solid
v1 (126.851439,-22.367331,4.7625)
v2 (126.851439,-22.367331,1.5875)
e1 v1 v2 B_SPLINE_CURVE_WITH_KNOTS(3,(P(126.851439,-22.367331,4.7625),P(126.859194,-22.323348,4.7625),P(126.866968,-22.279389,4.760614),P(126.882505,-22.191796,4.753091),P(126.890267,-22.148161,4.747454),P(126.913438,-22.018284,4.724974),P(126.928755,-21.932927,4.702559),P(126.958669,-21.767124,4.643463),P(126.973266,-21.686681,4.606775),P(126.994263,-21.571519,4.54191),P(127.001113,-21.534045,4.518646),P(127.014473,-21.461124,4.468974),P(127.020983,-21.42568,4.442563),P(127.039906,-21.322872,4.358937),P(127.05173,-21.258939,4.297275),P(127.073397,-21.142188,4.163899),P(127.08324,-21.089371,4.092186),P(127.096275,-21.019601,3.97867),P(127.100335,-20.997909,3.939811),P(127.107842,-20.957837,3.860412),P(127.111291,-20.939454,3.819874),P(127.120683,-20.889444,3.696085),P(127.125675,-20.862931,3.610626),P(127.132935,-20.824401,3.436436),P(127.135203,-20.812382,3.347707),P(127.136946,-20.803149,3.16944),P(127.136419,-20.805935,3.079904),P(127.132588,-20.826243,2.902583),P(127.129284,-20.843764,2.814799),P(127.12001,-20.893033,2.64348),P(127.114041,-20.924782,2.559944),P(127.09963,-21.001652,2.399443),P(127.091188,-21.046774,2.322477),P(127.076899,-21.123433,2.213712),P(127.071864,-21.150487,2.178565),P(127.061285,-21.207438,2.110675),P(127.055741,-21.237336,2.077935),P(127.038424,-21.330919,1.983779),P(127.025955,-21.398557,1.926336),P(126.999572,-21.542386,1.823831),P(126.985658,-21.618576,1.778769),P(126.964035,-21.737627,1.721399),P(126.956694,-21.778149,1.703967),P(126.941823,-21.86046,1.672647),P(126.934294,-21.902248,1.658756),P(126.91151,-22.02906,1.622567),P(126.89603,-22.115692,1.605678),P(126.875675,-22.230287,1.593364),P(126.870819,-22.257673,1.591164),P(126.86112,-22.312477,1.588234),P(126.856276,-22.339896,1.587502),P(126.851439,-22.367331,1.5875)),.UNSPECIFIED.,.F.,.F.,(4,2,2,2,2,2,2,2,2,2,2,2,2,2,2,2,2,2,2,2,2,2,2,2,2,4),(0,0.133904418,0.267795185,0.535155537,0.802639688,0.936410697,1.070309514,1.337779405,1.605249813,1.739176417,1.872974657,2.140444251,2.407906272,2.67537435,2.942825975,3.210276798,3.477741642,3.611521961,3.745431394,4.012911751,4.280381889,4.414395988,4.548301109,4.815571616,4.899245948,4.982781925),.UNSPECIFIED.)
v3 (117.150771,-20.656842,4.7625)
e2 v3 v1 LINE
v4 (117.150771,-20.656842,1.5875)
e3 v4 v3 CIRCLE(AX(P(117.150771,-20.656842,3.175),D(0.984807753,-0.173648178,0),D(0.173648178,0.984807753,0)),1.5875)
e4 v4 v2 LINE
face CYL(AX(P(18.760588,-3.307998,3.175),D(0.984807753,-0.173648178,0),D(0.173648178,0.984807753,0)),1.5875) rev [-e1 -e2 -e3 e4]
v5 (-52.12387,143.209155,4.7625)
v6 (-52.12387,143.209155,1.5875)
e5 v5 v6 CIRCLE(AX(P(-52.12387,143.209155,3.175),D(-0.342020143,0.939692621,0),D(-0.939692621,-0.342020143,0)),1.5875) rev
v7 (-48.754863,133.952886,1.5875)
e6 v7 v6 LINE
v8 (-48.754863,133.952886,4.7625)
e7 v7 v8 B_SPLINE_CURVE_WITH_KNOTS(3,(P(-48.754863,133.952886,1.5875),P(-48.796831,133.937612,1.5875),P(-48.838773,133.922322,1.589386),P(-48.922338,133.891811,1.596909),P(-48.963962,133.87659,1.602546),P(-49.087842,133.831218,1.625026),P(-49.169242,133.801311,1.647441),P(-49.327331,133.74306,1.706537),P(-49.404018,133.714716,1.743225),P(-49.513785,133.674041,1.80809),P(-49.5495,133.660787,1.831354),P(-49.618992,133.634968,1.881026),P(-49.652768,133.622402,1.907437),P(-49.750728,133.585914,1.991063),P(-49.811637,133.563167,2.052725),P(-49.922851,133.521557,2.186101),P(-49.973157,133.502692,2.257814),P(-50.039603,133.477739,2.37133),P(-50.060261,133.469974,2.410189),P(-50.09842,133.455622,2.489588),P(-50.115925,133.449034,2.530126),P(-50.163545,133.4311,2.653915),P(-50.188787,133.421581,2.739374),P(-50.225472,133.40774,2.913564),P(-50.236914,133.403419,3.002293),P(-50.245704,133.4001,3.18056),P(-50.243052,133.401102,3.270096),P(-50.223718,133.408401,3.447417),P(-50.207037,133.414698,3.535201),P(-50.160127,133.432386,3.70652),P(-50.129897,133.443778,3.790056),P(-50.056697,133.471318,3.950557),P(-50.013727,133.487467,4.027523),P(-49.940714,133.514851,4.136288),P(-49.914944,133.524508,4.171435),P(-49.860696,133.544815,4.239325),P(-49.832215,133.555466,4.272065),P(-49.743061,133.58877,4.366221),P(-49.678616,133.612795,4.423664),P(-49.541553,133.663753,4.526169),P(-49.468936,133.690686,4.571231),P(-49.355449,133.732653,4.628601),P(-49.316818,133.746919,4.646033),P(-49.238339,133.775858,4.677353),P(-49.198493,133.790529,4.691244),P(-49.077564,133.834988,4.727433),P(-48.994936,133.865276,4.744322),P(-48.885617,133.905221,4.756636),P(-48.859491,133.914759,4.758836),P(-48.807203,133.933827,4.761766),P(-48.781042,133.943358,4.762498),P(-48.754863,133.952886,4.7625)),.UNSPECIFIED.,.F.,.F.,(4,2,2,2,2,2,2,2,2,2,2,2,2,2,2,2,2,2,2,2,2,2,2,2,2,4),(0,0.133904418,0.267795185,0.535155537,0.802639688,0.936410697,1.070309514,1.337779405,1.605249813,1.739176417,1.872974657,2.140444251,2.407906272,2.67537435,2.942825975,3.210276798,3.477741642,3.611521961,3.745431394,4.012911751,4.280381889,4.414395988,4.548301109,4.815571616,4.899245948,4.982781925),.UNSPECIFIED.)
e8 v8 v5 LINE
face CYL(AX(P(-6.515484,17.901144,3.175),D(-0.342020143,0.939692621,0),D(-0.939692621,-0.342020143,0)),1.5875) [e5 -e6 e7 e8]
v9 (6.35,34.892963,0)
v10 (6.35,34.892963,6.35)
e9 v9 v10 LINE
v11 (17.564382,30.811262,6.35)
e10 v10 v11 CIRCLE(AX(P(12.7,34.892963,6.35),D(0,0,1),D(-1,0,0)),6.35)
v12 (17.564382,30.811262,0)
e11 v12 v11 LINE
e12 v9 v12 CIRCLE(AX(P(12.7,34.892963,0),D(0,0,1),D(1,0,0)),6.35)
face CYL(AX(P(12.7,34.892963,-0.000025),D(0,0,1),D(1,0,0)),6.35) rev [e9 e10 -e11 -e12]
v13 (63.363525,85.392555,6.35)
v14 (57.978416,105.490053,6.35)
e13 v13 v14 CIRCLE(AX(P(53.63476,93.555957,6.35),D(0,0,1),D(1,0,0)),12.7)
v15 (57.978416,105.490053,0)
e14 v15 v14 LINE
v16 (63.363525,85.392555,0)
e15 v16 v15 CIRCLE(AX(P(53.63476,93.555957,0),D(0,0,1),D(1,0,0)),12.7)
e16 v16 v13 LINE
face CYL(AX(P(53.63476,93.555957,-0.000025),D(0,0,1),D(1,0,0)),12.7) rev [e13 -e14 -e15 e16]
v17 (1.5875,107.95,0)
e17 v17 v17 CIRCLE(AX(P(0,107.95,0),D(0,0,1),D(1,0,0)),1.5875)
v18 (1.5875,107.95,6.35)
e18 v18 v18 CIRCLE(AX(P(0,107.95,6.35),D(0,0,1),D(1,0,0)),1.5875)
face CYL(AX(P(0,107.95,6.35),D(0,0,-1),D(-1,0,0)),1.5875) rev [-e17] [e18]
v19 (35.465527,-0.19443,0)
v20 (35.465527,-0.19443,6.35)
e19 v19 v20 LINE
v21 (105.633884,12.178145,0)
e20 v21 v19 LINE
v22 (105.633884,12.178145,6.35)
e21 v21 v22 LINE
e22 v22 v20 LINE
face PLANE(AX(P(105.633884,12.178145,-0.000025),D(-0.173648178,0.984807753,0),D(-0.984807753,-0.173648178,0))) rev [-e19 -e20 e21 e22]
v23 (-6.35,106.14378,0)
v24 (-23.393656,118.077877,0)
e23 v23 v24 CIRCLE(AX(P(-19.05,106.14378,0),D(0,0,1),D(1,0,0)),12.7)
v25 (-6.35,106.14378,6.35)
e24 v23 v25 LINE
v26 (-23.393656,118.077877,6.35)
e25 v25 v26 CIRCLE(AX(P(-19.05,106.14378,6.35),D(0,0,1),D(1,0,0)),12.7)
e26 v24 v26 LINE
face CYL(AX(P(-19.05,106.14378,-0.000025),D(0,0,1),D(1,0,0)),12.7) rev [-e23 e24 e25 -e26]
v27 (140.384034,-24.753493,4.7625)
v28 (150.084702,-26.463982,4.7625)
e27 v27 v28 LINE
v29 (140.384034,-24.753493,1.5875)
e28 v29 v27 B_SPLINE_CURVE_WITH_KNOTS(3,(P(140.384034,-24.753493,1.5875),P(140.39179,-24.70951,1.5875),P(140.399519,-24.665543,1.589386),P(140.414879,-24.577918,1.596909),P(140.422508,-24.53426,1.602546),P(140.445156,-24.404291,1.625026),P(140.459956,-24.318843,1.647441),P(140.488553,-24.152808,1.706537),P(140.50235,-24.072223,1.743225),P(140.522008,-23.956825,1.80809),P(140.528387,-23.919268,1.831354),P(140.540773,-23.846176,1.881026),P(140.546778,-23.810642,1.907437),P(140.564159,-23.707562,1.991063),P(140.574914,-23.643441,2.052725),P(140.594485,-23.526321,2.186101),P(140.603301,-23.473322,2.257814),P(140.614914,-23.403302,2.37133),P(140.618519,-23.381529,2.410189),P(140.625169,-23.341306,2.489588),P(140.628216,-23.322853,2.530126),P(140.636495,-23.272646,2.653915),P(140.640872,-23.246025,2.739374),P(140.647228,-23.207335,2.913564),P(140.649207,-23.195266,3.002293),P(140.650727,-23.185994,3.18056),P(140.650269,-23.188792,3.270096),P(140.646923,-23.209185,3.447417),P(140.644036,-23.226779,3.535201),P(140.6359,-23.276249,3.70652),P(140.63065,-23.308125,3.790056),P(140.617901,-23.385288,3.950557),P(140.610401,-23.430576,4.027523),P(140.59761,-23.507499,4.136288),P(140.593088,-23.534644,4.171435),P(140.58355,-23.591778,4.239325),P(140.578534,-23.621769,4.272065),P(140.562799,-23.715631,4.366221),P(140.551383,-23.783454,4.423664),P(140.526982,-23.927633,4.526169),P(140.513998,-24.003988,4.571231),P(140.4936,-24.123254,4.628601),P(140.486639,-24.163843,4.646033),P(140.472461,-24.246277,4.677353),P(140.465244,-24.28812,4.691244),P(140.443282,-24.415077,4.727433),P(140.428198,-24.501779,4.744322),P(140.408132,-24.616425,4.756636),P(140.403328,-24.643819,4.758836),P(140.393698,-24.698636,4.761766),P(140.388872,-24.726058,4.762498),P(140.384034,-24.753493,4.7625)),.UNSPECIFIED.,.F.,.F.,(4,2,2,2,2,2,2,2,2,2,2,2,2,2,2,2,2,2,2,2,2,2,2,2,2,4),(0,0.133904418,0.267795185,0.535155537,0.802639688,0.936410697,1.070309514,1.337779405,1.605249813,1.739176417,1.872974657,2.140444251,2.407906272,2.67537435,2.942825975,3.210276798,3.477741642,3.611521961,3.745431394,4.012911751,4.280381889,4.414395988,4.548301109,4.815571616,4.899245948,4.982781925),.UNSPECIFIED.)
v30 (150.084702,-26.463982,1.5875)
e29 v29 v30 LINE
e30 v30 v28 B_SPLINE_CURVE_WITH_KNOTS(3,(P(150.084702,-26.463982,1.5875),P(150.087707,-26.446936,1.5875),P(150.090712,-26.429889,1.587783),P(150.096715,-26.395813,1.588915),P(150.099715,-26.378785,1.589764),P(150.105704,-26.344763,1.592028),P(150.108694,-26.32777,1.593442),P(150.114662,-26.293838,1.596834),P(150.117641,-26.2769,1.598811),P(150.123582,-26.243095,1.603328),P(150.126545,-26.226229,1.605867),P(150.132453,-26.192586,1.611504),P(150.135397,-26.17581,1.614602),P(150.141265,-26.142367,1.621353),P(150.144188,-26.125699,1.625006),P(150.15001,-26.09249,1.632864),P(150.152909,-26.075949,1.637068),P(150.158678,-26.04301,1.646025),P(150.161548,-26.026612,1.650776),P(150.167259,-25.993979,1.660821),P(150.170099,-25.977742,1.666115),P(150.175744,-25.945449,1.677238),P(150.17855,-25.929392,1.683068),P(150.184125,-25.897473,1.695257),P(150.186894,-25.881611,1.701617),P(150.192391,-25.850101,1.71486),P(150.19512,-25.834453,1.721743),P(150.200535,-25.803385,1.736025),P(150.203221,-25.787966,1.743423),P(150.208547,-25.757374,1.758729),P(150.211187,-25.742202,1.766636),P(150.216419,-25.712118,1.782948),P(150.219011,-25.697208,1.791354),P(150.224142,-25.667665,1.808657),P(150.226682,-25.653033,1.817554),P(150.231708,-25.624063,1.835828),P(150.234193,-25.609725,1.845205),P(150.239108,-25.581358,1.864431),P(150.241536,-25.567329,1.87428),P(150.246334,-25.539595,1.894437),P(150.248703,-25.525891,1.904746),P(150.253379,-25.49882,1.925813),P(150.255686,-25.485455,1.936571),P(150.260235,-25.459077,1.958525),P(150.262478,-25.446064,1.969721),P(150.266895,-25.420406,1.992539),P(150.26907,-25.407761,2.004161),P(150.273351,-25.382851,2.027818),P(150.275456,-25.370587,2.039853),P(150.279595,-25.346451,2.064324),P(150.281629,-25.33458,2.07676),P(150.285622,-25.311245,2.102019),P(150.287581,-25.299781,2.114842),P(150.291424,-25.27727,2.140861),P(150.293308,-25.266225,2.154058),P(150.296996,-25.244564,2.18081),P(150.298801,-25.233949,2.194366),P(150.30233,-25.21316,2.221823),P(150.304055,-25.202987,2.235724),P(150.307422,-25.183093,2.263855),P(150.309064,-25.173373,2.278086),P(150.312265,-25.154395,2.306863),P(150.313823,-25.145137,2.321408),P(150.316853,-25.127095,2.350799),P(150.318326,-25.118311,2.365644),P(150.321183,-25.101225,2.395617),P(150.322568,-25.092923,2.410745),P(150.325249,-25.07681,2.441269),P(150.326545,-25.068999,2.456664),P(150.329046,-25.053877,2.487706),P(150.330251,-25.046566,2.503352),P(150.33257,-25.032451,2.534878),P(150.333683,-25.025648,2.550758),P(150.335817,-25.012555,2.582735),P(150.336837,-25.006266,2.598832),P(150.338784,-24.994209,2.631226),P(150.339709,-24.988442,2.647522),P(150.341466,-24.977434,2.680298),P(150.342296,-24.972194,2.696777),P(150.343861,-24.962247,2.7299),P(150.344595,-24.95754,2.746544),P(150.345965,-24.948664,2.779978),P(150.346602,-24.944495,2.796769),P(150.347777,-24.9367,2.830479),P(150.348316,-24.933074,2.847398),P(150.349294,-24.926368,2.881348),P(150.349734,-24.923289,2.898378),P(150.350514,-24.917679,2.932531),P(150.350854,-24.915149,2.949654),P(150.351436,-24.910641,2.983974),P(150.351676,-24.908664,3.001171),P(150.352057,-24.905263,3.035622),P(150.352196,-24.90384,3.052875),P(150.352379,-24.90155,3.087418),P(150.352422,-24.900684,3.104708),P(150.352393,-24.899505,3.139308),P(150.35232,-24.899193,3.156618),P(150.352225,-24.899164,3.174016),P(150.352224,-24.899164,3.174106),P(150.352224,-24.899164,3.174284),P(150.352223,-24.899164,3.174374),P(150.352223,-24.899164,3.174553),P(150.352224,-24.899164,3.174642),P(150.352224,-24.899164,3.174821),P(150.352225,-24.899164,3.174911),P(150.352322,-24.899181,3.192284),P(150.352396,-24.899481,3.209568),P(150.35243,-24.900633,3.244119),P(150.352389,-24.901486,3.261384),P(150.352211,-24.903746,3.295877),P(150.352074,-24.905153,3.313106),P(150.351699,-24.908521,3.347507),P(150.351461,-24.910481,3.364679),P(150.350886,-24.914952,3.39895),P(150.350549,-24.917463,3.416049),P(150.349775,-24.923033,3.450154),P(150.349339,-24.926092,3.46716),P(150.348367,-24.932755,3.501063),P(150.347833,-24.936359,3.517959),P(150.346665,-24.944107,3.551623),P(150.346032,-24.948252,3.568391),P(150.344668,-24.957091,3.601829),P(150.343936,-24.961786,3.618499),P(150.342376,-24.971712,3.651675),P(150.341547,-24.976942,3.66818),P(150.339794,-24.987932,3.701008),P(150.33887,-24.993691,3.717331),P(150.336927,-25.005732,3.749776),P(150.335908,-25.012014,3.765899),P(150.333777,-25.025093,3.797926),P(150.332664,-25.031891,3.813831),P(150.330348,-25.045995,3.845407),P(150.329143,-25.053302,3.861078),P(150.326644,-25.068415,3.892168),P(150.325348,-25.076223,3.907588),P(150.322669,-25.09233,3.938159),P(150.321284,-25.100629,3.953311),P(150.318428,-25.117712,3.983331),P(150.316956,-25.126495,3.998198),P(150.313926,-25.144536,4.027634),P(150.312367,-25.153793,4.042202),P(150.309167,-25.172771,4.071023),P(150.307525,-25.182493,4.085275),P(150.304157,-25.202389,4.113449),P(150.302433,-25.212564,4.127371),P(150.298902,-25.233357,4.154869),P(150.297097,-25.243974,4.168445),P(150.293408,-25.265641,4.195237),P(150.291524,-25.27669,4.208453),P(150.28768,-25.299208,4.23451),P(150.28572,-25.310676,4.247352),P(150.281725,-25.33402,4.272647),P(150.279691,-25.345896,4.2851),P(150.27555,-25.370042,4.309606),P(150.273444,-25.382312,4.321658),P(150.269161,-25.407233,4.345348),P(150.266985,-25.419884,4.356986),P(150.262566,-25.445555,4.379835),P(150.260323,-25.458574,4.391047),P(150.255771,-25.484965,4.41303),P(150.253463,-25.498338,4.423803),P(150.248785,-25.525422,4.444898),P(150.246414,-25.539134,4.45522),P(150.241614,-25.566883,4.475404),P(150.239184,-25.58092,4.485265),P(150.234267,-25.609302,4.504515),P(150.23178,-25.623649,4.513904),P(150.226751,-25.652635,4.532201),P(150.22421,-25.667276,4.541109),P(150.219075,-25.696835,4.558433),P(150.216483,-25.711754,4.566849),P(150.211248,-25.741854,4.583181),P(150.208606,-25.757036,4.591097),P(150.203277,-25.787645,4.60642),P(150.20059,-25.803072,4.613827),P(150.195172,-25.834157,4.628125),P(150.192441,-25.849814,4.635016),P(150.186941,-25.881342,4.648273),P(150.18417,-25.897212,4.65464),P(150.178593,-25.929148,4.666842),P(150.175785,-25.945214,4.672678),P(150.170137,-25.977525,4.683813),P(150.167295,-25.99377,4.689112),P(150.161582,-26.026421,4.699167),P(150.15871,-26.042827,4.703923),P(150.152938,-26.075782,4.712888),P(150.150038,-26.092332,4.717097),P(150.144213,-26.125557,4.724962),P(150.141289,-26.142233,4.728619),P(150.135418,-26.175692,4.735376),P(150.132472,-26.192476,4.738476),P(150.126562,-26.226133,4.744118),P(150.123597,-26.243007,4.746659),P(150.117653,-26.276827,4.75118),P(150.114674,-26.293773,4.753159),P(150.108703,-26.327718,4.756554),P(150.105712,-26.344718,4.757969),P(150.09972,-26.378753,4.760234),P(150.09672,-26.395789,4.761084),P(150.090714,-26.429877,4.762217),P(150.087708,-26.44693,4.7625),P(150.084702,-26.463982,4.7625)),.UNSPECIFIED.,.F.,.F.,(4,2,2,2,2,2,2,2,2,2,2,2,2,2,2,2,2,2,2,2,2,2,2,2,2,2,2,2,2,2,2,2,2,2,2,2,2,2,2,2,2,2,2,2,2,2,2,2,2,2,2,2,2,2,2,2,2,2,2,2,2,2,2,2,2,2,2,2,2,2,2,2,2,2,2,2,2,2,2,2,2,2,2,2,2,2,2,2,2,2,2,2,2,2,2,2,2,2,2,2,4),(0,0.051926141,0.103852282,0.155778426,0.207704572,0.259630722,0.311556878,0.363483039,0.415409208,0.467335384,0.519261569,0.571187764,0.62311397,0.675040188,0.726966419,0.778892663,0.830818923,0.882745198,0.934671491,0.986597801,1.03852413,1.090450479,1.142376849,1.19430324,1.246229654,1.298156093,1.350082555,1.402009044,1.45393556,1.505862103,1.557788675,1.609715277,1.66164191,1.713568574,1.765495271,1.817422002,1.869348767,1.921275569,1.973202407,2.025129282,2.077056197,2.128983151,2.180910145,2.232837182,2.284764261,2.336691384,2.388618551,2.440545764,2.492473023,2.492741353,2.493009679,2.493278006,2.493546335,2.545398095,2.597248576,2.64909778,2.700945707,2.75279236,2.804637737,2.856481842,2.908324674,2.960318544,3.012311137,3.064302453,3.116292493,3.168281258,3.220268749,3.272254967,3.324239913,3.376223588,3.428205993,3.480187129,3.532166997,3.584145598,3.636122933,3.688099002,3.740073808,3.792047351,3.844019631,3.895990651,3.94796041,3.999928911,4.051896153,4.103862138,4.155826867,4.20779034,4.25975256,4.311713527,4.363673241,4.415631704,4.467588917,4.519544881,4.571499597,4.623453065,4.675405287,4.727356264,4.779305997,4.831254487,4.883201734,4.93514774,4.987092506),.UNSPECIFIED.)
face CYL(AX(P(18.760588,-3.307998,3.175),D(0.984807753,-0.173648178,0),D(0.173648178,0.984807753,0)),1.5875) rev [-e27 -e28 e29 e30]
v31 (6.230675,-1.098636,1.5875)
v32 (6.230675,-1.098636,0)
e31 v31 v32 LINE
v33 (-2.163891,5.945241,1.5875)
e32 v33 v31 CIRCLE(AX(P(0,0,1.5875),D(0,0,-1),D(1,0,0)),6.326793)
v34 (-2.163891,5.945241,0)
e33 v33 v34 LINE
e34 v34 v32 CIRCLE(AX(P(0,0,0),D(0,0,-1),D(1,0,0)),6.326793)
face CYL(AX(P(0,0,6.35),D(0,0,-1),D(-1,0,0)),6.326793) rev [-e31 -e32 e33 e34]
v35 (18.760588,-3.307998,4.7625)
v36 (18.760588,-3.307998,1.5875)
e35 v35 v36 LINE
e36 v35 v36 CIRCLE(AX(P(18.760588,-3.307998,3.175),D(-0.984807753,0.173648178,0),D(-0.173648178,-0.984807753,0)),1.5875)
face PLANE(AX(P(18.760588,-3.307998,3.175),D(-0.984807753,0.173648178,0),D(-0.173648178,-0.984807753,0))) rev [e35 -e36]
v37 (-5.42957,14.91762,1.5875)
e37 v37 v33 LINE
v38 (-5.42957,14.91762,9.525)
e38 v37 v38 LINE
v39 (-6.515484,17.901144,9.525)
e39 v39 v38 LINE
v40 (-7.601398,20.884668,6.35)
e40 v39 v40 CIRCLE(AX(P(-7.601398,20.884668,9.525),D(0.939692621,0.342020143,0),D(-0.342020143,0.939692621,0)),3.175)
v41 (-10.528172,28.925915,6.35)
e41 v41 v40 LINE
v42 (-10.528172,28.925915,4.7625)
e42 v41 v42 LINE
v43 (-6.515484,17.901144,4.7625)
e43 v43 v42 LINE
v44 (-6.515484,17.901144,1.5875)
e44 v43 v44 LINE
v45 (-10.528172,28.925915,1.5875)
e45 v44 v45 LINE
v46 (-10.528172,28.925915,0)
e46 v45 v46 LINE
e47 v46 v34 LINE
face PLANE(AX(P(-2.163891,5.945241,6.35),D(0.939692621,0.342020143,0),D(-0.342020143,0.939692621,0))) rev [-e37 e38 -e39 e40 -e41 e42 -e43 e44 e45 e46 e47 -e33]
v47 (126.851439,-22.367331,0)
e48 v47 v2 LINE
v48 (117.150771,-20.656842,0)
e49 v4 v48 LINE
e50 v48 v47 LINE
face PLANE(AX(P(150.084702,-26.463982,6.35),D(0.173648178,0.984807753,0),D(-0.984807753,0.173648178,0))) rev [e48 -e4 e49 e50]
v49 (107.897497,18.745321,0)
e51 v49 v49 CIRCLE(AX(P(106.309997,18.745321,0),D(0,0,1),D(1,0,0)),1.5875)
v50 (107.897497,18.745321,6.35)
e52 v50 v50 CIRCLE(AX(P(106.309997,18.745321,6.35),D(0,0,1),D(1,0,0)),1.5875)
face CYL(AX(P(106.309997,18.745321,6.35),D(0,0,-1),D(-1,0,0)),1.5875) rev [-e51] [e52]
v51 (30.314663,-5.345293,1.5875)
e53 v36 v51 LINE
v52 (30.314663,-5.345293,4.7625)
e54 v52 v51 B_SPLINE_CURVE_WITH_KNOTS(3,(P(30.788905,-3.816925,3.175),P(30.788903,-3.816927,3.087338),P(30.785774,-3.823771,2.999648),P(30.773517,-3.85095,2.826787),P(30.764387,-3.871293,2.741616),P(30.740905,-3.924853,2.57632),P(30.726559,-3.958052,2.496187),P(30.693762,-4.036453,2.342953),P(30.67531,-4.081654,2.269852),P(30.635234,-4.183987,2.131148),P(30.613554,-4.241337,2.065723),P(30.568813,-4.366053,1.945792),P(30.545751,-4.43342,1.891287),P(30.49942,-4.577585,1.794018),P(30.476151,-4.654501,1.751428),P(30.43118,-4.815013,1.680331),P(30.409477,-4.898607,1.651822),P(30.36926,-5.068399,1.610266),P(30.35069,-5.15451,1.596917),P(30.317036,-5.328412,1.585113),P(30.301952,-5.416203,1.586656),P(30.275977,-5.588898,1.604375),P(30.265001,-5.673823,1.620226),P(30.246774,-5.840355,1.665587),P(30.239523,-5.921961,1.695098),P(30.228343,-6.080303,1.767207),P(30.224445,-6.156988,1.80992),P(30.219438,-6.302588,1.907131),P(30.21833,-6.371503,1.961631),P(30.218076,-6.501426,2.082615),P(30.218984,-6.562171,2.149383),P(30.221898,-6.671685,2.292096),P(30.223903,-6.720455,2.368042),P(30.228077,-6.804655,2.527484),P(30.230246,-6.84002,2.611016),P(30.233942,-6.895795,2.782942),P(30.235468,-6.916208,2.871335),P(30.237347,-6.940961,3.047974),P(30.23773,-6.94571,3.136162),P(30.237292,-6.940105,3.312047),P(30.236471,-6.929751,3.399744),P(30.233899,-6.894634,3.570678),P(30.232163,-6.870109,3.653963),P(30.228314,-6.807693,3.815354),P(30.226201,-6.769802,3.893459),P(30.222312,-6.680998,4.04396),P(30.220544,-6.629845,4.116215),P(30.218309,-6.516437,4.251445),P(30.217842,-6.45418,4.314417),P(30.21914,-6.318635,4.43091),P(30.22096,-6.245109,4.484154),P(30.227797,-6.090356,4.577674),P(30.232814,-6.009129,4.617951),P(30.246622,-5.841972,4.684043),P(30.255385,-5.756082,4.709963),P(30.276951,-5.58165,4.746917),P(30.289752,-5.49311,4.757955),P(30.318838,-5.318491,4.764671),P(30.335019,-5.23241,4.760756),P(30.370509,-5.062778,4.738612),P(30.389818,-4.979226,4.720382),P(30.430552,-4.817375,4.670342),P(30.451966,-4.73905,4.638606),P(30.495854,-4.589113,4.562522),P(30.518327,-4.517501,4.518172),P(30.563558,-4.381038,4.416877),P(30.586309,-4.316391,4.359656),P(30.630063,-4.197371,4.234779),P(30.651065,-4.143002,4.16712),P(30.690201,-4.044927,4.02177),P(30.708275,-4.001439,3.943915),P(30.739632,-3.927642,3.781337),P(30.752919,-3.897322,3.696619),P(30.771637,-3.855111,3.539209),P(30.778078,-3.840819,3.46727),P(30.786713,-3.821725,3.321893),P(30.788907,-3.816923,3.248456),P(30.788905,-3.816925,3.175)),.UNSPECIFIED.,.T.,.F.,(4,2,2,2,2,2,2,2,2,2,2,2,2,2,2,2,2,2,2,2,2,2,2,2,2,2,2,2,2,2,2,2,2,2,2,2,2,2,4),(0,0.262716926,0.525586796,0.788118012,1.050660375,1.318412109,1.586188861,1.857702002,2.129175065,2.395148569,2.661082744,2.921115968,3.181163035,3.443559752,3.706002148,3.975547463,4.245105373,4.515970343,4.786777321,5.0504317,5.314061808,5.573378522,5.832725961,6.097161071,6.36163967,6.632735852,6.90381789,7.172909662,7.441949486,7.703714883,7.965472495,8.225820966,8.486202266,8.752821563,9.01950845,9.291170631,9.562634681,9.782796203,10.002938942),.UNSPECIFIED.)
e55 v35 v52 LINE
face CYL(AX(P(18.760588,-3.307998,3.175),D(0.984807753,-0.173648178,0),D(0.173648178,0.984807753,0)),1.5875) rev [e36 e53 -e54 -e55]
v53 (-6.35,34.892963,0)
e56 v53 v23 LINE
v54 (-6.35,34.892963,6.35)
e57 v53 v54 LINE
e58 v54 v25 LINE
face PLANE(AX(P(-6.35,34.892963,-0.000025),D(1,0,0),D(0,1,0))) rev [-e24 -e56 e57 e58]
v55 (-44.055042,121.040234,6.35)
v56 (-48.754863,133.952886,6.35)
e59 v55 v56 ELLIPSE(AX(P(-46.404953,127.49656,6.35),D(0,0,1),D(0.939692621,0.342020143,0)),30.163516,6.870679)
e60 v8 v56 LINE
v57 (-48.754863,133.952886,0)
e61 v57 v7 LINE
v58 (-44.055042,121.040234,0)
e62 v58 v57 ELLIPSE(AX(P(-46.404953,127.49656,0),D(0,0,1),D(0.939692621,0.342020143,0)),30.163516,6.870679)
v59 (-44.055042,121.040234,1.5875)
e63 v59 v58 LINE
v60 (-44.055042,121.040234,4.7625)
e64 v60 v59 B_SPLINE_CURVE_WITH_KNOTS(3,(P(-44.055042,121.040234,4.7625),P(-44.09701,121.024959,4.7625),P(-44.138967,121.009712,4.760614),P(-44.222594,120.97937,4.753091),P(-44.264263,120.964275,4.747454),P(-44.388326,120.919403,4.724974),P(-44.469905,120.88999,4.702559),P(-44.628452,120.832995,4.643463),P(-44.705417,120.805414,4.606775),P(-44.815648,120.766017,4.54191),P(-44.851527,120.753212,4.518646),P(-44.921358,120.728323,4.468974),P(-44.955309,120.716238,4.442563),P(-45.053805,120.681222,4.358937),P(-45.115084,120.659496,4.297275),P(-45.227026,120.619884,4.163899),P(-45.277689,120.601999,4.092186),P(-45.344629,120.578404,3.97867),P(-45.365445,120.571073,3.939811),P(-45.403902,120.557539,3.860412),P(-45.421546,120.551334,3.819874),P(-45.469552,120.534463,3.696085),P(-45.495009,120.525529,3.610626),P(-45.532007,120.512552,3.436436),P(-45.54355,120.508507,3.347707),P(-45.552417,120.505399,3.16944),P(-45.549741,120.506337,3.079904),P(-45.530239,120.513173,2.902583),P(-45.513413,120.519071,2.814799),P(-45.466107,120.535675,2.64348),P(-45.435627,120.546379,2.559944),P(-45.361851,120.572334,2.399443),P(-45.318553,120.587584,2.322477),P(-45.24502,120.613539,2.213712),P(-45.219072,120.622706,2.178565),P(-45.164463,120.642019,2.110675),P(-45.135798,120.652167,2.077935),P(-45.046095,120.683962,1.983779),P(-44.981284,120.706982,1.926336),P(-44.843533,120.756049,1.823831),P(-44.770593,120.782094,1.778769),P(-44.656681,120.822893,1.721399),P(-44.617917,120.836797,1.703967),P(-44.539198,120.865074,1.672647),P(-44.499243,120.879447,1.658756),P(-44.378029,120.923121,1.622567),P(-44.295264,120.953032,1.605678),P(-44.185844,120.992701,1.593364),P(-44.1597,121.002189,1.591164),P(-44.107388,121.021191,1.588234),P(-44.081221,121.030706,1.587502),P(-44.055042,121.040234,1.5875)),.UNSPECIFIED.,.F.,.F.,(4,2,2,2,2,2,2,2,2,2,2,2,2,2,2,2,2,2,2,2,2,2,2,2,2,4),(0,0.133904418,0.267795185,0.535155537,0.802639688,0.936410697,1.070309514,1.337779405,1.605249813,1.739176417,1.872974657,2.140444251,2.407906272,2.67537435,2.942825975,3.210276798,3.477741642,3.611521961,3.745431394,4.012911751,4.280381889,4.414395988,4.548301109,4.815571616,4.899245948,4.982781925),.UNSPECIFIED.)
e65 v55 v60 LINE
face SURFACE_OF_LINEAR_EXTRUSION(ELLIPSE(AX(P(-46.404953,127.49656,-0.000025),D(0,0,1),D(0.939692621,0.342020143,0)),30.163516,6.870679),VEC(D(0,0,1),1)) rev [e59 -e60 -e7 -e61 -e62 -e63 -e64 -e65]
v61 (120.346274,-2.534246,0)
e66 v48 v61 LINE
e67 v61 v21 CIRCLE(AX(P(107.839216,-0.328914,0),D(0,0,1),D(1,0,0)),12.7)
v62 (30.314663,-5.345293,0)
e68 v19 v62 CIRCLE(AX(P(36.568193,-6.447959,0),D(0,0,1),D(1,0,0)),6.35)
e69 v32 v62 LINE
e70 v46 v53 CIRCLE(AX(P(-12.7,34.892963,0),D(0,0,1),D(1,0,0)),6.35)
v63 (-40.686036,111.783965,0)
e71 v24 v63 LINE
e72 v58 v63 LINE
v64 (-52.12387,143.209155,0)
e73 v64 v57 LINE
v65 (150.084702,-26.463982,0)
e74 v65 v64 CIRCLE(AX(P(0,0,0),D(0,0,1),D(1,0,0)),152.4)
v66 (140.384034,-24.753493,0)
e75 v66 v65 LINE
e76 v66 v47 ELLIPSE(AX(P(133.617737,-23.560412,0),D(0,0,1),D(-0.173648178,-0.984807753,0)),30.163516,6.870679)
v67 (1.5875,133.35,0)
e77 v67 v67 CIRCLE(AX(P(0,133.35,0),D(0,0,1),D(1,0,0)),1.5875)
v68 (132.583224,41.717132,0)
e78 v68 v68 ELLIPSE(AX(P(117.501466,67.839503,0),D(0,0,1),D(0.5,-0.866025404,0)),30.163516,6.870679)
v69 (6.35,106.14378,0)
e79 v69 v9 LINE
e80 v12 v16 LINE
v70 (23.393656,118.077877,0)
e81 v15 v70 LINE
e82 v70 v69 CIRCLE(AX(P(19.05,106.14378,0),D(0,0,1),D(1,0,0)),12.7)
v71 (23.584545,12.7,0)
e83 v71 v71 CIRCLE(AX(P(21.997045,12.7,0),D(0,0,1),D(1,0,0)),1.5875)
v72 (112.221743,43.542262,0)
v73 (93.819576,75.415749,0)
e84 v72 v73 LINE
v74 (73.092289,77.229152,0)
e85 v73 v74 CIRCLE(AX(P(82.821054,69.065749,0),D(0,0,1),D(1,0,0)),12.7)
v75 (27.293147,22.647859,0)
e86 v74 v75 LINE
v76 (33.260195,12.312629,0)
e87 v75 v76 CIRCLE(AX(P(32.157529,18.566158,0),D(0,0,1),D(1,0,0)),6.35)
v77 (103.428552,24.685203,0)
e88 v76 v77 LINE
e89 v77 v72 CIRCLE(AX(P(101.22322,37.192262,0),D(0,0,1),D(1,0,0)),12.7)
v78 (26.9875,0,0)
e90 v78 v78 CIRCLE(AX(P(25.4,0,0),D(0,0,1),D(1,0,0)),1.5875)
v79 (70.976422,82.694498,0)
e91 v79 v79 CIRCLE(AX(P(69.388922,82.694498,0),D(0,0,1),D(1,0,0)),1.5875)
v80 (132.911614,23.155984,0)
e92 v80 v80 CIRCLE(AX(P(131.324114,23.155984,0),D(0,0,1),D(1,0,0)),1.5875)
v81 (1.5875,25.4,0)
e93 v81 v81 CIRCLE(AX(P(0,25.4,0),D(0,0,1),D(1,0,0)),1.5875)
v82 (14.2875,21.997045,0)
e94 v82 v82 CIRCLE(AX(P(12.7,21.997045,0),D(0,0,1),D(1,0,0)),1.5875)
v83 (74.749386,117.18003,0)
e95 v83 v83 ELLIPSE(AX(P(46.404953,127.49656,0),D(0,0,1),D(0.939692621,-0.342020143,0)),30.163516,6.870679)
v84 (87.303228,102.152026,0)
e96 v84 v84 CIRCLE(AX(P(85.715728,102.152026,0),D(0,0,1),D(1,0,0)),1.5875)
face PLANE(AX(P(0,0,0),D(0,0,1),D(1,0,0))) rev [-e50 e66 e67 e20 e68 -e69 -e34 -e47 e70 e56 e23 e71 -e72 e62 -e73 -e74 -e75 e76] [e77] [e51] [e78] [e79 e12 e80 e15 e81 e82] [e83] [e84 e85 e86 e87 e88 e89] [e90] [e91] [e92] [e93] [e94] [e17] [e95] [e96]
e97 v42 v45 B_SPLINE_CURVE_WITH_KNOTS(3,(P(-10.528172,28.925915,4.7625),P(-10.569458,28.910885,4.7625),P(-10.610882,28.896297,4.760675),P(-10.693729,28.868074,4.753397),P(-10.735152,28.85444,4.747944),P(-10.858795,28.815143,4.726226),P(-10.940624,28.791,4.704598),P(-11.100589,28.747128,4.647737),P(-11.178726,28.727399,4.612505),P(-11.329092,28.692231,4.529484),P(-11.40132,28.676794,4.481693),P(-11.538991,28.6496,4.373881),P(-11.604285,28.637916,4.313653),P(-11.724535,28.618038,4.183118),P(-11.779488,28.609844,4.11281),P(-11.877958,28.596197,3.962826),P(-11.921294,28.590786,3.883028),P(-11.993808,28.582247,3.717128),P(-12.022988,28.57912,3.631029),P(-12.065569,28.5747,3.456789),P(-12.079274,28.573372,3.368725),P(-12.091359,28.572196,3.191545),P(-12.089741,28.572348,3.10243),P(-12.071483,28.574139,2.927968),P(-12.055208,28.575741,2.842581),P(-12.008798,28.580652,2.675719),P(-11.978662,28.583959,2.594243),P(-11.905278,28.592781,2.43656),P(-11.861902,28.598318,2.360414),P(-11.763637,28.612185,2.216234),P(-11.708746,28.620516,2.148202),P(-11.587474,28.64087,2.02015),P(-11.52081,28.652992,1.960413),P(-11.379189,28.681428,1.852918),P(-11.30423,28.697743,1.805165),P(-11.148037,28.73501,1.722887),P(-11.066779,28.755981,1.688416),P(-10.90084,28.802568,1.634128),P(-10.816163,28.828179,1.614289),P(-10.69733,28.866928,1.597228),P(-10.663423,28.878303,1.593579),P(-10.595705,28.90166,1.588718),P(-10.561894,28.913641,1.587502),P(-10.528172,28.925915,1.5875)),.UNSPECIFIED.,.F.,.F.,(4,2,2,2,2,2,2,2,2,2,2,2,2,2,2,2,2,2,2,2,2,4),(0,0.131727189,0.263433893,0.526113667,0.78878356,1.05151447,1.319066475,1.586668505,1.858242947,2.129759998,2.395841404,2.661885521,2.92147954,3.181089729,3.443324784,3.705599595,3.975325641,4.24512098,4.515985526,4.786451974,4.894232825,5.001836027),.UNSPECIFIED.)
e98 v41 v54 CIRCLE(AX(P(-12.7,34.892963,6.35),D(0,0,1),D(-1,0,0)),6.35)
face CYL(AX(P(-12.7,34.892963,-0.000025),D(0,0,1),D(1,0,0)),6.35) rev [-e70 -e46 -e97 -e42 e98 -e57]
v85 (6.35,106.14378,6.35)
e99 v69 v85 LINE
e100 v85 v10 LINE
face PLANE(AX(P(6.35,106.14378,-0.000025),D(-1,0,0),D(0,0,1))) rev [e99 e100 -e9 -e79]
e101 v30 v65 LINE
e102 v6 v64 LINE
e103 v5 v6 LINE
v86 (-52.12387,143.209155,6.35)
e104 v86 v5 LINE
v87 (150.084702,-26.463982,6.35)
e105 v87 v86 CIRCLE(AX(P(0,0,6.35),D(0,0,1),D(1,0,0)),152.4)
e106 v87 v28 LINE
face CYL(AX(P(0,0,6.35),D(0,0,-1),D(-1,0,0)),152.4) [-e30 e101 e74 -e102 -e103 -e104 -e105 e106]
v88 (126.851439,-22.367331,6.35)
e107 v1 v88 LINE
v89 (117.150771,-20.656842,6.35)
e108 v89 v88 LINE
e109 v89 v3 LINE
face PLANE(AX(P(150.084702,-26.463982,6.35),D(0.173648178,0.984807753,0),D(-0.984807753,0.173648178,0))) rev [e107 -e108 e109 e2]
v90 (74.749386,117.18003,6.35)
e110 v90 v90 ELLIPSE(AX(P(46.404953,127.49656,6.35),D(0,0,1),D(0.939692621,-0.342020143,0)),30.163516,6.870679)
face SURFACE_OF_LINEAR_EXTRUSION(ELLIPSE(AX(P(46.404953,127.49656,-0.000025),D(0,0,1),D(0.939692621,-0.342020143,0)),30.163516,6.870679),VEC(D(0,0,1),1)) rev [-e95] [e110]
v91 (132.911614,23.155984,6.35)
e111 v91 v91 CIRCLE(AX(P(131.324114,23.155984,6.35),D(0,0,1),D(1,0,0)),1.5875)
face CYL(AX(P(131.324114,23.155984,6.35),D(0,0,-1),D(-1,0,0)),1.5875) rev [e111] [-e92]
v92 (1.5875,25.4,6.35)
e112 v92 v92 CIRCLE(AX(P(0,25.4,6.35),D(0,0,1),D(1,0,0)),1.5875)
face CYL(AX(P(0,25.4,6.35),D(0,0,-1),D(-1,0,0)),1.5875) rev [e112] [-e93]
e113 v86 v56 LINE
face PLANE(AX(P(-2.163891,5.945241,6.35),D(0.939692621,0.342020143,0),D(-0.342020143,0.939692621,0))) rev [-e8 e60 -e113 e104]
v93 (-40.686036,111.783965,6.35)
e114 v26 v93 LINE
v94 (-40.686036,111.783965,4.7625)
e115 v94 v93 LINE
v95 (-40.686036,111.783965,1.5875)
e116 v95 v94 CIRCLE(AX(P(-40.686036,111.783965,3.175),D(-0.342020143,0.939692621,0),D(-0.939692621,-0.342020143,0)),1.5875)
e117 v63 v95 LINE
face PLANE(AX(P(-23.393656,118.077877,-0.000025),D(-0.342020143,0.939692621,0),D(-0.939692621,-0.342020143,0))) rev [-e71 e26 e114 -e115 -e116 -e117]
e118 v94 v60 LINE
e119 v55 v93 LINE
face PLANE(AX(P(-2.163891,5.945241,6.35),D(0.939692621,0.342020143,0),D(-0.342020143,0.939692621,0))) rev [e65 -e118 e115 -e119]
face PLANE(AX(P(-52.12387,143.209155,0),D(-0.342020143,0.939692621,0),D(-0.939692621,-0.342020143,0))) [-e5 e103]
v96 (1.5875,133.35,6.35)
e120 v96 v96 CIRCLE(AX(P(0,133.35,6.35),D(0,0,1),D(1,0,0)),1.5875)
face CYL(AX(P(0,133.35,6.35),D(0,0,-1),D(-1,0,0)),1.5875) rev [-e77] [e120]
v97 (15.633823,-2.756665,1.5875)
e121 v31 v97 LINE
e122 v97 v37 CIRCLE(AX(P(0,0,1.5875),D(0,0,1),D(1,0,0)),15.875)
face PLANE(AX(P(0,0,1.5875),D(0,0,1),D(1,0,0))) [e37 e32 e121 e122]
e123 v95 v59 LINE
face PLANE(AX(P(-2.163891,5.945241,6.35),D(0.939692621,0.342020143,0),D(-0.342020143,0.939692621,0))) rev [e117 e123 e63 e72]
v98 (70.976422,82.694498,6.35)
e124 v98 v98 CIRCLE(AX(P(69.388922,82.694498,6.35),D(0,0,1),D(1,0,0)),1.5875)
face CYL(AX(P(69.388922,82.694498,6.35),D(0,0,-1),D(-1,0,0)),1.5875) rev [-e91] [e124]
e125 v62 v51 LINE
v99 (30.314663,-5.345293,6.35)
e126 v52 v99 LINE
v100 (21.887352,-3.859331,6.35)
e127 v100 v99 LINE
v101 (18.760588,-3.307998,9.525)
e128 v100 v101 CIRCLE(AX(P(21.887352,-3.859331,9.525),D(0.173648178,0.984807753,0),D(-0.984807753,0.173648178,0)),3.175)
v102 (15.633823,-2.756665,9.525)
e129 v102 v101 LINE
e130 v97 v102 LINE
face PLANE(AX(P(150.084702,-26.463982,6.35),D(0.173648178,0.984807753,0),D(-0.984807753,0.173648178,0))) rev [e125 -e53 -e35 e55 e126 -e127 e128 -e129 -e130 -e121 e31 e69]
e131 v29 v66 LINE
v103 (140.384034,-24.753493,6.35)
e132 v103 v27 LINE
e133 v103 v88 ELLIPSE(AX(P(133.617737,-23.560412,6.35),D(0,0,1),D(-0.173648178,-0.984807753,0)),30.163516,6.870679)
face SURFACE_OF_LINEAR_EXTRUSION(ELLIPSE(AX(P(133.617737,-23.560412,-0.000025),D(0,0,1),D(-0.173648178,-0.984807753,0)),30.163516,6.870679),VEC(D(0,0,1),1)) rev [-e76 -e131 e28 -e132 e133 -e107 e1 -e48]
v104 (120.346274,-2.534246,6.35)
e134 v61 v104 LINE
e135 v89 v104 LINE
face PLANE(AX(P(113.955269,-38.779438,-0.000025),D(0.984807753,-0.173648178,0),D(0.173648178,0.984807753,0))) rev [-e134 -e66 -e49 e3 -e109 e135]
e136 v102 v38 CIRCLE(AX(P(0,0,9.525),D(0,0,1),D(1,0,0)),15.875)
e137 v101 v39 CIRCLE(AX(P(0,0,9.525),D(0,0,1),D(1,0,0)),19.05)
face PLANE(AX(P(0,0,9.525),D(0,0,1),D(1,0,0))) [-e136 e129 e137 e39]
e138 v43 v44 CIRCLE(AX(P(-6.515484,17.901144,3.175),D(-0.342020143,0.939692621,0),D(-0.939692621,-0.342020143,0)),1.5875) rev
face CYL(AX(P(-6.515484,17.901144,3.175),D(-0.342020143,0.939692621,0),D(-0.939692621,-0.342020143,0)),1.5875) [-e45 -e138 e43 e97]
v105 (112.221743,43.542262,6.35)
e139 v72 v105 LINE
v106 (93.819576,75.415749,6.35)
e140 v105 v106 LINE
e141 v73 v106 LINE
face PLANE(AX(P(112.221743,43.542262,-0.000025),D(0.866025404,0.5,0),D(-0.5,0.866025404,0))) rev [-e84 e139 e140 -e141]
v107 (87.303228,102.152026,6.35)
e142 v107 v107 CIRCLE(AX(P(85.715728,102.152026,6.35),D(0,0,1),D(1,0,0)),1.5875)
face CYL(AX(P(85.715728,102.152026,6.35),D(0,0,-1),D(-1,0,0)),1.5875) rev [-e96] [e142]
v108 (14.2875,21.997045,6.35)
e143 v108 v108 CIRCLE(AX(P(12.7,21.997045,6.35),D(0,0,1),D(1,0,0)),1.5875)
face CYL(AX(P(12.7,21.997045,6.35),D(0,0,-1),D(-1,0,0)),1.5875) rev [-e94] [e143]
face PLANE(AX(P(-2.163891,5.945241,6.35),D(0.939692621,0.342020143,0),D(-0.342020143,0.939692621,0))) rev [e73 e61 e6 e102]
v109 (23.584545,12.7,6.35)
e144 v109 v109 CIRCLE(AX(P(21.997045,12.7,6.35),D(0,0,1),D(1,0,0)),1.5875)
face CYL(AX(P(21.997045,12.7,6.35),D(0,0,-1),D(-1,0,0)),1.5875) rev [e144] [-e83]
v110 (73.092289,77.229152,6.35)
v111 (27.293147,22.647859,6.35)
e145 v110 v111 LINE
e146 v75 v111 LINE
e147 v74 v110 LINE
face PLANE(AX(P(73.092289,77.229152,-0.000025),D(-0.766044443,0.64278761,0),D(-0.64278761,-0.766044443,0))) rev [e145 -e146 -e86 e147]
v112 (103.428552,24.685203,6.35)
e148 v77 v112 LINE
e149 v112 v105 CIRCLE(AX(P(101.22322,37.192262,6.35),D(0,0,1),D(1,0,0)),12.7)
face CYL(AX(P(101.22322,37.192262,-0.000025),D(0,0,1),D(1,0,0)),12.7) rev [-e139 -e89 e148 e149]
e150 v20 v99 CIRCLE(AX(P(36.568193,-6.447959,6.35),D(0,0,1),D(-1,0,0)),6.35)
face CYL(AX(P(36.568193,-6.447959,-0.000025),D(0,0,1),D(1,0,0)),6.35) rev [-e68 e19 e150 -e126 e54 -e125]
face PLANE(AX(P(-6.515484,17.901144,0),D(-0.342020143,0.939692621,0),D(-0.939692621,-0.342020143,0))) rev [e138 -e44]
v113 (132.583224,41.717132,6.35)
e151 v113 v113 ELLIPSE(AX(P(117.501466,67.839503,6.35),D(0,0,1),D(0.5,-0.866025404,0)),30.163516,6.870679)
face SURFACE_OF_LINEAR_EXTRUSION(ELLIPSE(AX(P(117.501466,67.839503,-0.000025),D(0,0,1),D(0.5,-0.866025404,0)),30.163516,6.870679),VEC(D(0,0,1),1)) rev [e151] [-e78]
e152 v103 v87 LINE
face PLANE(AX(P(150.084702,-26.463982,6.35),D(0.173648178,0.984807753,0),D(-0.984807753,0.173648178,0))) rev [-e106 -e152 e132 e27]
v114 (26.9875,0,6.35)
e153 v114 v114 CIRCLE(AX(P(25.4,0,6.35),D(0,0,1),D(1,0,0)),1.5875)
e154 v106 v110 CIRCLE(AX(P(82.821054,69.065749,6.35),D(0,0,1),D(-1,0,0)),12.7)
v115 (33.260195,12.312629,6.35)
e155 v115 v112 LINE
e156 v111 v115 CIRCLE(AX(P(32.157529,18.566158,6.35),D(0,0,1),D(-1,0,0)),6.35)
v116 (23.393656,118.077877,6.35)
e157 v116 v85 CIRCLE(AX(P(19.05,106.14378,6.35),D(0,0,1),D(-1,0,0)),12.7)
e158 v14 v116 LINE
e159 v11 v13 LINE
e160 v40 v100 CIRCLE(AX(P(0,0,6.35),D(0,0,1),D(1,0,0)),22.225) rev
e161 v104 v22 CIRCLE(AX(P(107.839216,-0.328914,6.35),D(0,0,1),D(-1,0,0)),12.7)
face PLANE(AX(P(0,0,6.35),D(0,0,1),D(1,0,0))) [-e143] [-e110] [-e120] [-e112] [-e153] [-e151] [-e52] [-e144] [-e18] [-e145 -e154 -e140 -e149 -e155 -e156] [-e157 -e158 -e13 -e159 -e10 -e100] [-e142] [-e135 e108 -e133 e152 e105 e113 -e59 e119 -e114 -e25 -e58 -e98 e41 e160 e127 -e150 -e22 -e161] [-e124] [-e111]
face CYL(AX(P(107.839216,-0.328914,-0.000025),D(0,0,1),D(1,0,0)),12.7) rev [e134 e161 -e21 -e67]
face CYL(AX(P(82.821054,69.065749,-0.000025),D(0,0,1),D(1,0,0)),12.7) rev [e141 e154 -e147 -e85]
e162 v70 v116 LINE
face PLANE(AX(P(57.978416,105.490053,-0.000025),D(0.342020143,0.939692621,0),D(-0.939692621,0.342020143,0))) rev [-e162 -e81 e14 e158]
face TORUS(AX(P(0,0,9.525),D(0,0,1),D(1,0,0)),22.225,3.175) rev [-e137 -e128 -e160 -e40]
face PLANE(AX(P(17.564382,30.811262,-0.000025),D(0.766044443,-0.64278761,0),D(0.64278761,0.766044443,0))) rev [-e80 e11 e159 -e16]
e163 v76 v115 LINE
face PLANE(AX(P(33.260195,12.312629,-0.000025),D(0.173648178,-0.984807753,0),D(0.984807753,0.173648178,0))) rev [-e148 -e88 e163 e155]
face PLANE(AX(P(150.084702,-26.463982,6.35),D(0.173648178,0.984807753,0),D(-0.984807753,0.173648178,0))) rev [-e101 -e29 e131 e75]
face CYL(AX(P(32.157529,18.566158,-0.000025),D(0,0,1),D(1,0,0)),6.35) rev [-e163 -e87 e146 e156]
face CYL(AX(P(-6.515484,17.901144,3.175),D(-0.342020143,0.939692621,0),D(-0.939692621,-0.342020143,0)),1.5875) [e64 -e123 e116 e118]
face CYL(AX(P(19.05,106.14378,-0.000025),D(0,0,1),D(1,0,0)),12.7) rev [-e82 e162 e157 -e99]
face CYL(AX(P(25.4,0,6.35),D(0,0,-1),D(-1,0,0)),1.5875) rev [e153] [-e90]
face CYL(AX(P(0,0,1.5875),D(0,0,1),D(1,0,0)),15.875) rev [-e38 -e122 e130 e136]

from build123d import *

# Parameters (mm, degrees)
SKETCH1_R           = 1.5875
BOSS_EXTRUDE1_DEPTH = 6.35
BOSS_EXTRUDE2_DEPTH = 133.35
CUT_EXTRUDE1_DEPTH  = 133.35
SKETCH5_RX          = 30.163516005
SKETCH5_RY          = 6.87067886
CUT_EXTRUDE2_DEPTH  = 216.619671093
BOSS_EXTRUDE3_DEPTH = 3.175
CUT_EXTRUDE3_START  = -7.9375
CUT_EXTRUDE3_DEPTH  = 7.9375
FILLET1_R           = 3.175


with BuildPart() as part:
    # Sketch1 → Boss-Extrude1 (new body)
    with BuildSketch(Plane.XY):
        with BuildLine():
            Line((150.084701559, -26.463982276), (6.230674922, -1.098636097))
            ThreePointArc((6.230674922, -1.098636097), (4.06678423, 4.846604717), (-2.163890692, 5.945240813))
            Line((-2.163890692, 5.945240813), (-52.123869843, 143.209155408))
            ThreePointArc((-52.123869843, 143.209155408), (97.960831716, 116.745173131), (150.084701559, -26.463982276))
        make_face()
        with Locations((0, 133.35)):
            Circle(SKETCH1_R, mode=Mode.SUBTRACT)
        with Locations((0, 107.95)):
            Circle(SKETCH1_R, mode=Mode.SUBTRACT)
        with Locations((85.715727752, 102.15202649)):
            Circle(SKETCH1_R, mode=Mode.SUBTRACT)
        with Locations((69.388922466, 82.694497635)):
            Circle(SKETCH1_R, mode=Mode.SUBTRACT)
        with Locations((131.324113864, 23.155984492)):
            Circle(SKETCH1_R, mode=Mode.SUBTRACT)
        with Locations((106.309996938, 18.745320779)):
            Circle(SKETCH1_R, mode=Mode.SUBTRACT)
        with Locations((0, 25.4)):
            Circle(SKETCH1_R, mode=Mode.SUBTRACT)
        with Locations((12.7, 21.997045256)):
            Circle(SKETCH1_R, mode=Mode.SUBTRACT)
        with Locations((21.997045256, 12.7)):
            Circle(SKETCH1_R, mode=Mode.SUBTRACT)
        with Locations((25.4, 0)):
            Circle(SKETCH1_R, mode=Mode.SUBTRACT)
    extrude(amount=BOSS_EXTRUDE1_DEPTH)

    # Sketch2 → Boss-Extrude2 (add)
    with BuildSketch(Plane(origin=(-52.123869843, 143.209155408, 0), x_dir=(0, 0, -1), z_dir=(-0.342020143325673, 0.939692620785907, 0))):
        with BuildLine():
            ThreePointArc((-4.7625, 0), (-3.175, 1.5875), (-1.5875, 0))
            Line((-1.5875, 0), (-4.7625, 0))
        make_face()
    extrude(amount=-BOSS_EXTRUDE2_DEPTH)

    # Sketch3 → Cut-Extrude1 (cut)
    with BuildSketch(Plane(origin=(150.084701559, -26.463982276, 0), x_dir=(0, 0, -1), z_dir=(-0.9848077530122086, 0.1736481776669274, 0))):
        with BuildLine():
            Line((-4.7625, 0), (-1.5875, 0))
            ThreePointArc((-1.5875, 0), (-3.175, -1.5875), (-4.7625, 0))
        make_face()
    extrude(amount=CUT_EXTRUDE1_DEPTH, mode=Mode.SUBTRACT)

    # Sketch5 → Cut-Extrude2 (cut, through all)
    with BuildSketch(Plane.XY.offset(6.35)):
        with Locations(Location((46.404952904, 127.496560255), (0, 0, 160))):
            Ellipse(SKETCH5_RX, SKETCH5_RY)
        with Locations(Location((117.501465515, 67.839502745), (0, 0, -60))):
            Ellipse(SKETCH5_RX, SKETCH5_RY)
        with Locations(Location((133.617736528, -23.560412051), (0, 0, -100))):
            Ellipse(SKETCH5_RX, SKETCH5_RY)
        with Locations(Location((87.212783624, -103.936148204), (0, 0, -140))):
            Ellipse(SKETCH5_RX, SKETCH5_RY)
        with Locations(Location((0, -135.679005491), (0, 0, 180))):
            Ellipse(SKETCH5_RX, SKETCH5_RY)
        with Locations(Location((-87.212783624, -103.936148204), (0, 0, 140))):
            Ellipse(SKETCH5_RX, SKETCH5_RY)
        with Locations(Location((-133.617736528, -23.560412051), (0, 0, 100))):
            Ellipse(SKETCH5_RX, SKETCH5_RY)
        with Locations(Location((-117.501465515, 67.839502746), (0, 0, 60))):
            Ellipse(SKETCH5_RX, SKETCH5_RY)
        with Locations(Location((-46.404952904, 127.496560255), (0, 0, 20))):
            Ellipse(SKETCH5_RX, SKETCH5_RY)
        with BuildLine():
            Line((57.978416111, 105.49005345), (23.39365582, 118.077876756))
            ThreePointArc((23.39365582, 118.077876756), (11.765579258, 116.547011434), (6.35, 106.143780472))
            Line((6.35, 106.143780472), (6.35, 34.892963227))
            ThreePointArc((6.35, 34.892963227), (10.52817209, 28.925915085), (17.564382214, 30.811261906))
            Line((17.564382214, 30.811261906), (63.363524719, 85.392554523))
            ThreePointArc((63.363524719, 85.392554523), (65.902018285, 96.842959039), (57.978416111, 105.49005345))
        make_face()
        with BuildLine():
            Line((112.221742786, 43.542261744), (93.819576202, 75.415749237))
            ThreePointArc((93.819576202, 75.415749237), (83.927931507, 81.717421903), (73.092289146, 77.22915188))
            Line((73.092289146, 77.22915188), (27.293146641, 22.647859263))
            ThreePointArc((27.293146641, 22.647859263), (26.658267541, 15.391157941), (33.260194783, 12.312628709))
            Line((33.260194783, 12.312628709), (103.428552014, 24.685203281))
            ThreePointArc((103.428552014, 24.685203281), (112.733329053, 31.82500982), (112.221742786, 43.542261744))
        make_face()
        with BuildLine():
            Line((113.955268805, -38.77943815), (120.34627419, -2.534245502))
            ThreePointArc((120.34627419, -2.534245502), (116.819471848, 8.651342476), (105.633883871, 12.178144818))
            Line((105.633883871, 12.178144818), (35.46552664, -0.194429754))
            ThreePointArc((35.46552664, -0.194429754), (30.314663336, -5.345293057), (33.393192568, -11.9472203))
            Line((33.393192568, -11.9472203), (95.098210342, -47.572628922))
            ThreePointArc((95.098210342, -47.572628922), (106.815462266, -48.084215189), (113.955268805, -38.77943815))
        make_face()
        with BuildLine():
            Line((62.367858079, -102.955807949), (90.561612985, -79.298438606))
            ThreePointArc((90.561612985, -79.298438606), (95.049883008, -68.462796245), (88.748210342, -58.57115155))
            Line((88.748210342, -58.57115155), (27.043192568, -22.945742928))
            ThreePointArc((27.043192568, -22.945742928), (19.786491246, -23.580622028), (17.901144426, -30.616832152))
            Line((17.901144426, -30.616832152), (42.270359152, -97.570699341))
            ThreePointArc((42.270359152, -97.570699341), (50.917453563, -105.494301515), (62.367858079, -102.955807949))
        make_face()
        with BuildLine():
            Line((-18.402166584, -118.958010982), (18.402166584, -118.958010982))
            ThreePointArc((18.402166584, -118.958010982), (28.805397546, -113.542431724), (30.336262868, -101.914355162))
            Line((30.336262868, -101.914355162), (5.967048142, -34.960487972))
            ThreePointArc((5.967048142, -34.960487972), (0, -30.782315882), (-5.967048142, -34.960487972))
            Line((-5.967048142, -34.960487972), (-30.336262868, -101.914355162))
            ThreePointArc((-30.336262868, -101.914355162), (-28.805397547, -113.542431723), (-18.402166584, -118.958010982))
        make_face()
        with BuildLine():
            Line((-90.561612985, -79.298438605), (-62.367858079, -102.955807949))
            ThreePointArc((-62.367858079, -102.955807949), (-50.917453563, -105.494301515), (-42.270359152, -97.570699341))
            Line((-42.270359152, -97.570699341), (-17.901144426, -30.616832152))
            ThreePointArc((-17.901144426, -30.616832152), (-19.786491246, -23.580622028), (-27.043192568, -22.945742928))
            Line((-27.043192568, -22.945742928), (-88.748210342, -58.57115155))
            ThreePointArc((-88.748210342, -58.57115155), (-95.049883008, -68.462796245), (-90.561612985, -79.298438605))
        make_face()
        with BuildLine():
            Line((-120.34627419, -2.534245501), (-113.955268805, -38.77943815))
            ThreePointArc((-113.955268805, -38.77943815), (-106.815462266, -48.084215189), (-95.098210342, -47.572628922))
            Line((-95.098210342, -47.572628922), (-33.393192568, -11.947220299))
            ThreePointArc((-33.393192568, -11.947220299), (-30.314663336, -5.345293057), (-35.46552664, -0.194429754))
            Line((-35.46552664, -0.194429754), (-105.633883871, 12.178144818))
            ThreePointArc((-105.633883871, 12.178144818), (-116.819471848, 8.651342476), (-120.34627419, -2.534245501))
        make_face()
        with BuildLine():
            Line((-93.819576202, 75.415749238), (-112.221742786, 43.542261745))
            ThreePointArc((-112.221742786, 43.542261745), (-112.733329053, 31.825009821), (-103.428552014, 24.685203281))
            Line((-103.428552014, 24.685203281), (-33.260194783, 12.312628709))
            ThreePointArc((-33.260194783, 12.312628709), (-26.658267541, 15.391157941), (-27.293146641, 22.647859263))
            Line((-27.293146641, 22.647859263), (-73.092289146, 77.229151881))
            ThreePointArc((-73.092289146, 77.229151881), (-83.927931506, 81.717421903), (-93.819576202, 75.415749238))
        make_face()
        with BuildLine():
            Line((-23.39365582, 118.077876756), (-57.978416111, 105.490053451))
            ThreePointArc((-57.978416111, 105.490053451), (-65.902018285, 96.842959039), (-63.363524718, 85.392554524))
            Line((-63.363524718, 85.392554524), (-17.564382214, 30.811261906))
            ThreePointArc((-17.564382214, 30.811261906), (-10.52817209, 28.925915085), (-6.35, 34.892963227))
            Line((-6.35, 34.892963227), (-6.35, 106.143780472))
            ThreePointArc((-6.35, 106.143780472), (-11.765579258, 116.547011434), (-23.39365582, 118.077876756))
        make_face()
    extrude(amount=-CUT_EXTRUDE2_DEPTH, mode=Mode.SUBTRACT)

    # Sketch6 → Boss-Extrude3 (add)
    with BuildSketch(Plane.XY.offset(6.35)):
        with BuildLine():
            Line((6.230674922, -1.098636097), (18.760587695, -3.307997785))
            ThreePointArc((18.760587695, -3.307997785), (12.245103965, 14.593146641), (-6.51548373, 17.901144426))
            Line((-6.51548373, 17.901144426), (-2.163890692, 5.945240813))
            ThreePointArc((-2.163890692, 5.945240813), (4.06678423, 4.846604717), (6.230674922, -1.098636097))
        make_face()
    extrude(amount=BOSS_EXTRUDE3_DEPTH)

    # Sketch7 → Cut-Extrude3 (cut)
    with BuildSketch(Plane.XY.offset(9.525).offset(CUT_EXTRUDE3_START)):
        with BuildLine():
            Line((6.230674922, -1.098636097), (15.633823079, -2.75666482))
            ThreePointArc((15.633823079, -2.75666482), (10.204253304, 12.160955535), (-5.429569775, 14.917620355))
            Line((-5.429569775, 14.917620355), (-2.163890692, 5.945240813))
            ThreePointArc((-2.163890692, 5.945240813), (4.06678423, 4.846604717), (6.230674922, -1.098636097))
        make_face()
    extrude(amount=CUT_EXTRUDE3_DEPTH, mode=Mode.SUBTRACT)

    # Fillet1
    fillet1_edges = [part.edges().sort_by_distance(p)[0] for p in [
        (12.245103965, 14.593146641, 6.35),
    ]]
    fillet(fillet1_edges, radius=FILLET1_R - 0.0001)  # a hair under: the kernel refuses the full size


solid = part.part
